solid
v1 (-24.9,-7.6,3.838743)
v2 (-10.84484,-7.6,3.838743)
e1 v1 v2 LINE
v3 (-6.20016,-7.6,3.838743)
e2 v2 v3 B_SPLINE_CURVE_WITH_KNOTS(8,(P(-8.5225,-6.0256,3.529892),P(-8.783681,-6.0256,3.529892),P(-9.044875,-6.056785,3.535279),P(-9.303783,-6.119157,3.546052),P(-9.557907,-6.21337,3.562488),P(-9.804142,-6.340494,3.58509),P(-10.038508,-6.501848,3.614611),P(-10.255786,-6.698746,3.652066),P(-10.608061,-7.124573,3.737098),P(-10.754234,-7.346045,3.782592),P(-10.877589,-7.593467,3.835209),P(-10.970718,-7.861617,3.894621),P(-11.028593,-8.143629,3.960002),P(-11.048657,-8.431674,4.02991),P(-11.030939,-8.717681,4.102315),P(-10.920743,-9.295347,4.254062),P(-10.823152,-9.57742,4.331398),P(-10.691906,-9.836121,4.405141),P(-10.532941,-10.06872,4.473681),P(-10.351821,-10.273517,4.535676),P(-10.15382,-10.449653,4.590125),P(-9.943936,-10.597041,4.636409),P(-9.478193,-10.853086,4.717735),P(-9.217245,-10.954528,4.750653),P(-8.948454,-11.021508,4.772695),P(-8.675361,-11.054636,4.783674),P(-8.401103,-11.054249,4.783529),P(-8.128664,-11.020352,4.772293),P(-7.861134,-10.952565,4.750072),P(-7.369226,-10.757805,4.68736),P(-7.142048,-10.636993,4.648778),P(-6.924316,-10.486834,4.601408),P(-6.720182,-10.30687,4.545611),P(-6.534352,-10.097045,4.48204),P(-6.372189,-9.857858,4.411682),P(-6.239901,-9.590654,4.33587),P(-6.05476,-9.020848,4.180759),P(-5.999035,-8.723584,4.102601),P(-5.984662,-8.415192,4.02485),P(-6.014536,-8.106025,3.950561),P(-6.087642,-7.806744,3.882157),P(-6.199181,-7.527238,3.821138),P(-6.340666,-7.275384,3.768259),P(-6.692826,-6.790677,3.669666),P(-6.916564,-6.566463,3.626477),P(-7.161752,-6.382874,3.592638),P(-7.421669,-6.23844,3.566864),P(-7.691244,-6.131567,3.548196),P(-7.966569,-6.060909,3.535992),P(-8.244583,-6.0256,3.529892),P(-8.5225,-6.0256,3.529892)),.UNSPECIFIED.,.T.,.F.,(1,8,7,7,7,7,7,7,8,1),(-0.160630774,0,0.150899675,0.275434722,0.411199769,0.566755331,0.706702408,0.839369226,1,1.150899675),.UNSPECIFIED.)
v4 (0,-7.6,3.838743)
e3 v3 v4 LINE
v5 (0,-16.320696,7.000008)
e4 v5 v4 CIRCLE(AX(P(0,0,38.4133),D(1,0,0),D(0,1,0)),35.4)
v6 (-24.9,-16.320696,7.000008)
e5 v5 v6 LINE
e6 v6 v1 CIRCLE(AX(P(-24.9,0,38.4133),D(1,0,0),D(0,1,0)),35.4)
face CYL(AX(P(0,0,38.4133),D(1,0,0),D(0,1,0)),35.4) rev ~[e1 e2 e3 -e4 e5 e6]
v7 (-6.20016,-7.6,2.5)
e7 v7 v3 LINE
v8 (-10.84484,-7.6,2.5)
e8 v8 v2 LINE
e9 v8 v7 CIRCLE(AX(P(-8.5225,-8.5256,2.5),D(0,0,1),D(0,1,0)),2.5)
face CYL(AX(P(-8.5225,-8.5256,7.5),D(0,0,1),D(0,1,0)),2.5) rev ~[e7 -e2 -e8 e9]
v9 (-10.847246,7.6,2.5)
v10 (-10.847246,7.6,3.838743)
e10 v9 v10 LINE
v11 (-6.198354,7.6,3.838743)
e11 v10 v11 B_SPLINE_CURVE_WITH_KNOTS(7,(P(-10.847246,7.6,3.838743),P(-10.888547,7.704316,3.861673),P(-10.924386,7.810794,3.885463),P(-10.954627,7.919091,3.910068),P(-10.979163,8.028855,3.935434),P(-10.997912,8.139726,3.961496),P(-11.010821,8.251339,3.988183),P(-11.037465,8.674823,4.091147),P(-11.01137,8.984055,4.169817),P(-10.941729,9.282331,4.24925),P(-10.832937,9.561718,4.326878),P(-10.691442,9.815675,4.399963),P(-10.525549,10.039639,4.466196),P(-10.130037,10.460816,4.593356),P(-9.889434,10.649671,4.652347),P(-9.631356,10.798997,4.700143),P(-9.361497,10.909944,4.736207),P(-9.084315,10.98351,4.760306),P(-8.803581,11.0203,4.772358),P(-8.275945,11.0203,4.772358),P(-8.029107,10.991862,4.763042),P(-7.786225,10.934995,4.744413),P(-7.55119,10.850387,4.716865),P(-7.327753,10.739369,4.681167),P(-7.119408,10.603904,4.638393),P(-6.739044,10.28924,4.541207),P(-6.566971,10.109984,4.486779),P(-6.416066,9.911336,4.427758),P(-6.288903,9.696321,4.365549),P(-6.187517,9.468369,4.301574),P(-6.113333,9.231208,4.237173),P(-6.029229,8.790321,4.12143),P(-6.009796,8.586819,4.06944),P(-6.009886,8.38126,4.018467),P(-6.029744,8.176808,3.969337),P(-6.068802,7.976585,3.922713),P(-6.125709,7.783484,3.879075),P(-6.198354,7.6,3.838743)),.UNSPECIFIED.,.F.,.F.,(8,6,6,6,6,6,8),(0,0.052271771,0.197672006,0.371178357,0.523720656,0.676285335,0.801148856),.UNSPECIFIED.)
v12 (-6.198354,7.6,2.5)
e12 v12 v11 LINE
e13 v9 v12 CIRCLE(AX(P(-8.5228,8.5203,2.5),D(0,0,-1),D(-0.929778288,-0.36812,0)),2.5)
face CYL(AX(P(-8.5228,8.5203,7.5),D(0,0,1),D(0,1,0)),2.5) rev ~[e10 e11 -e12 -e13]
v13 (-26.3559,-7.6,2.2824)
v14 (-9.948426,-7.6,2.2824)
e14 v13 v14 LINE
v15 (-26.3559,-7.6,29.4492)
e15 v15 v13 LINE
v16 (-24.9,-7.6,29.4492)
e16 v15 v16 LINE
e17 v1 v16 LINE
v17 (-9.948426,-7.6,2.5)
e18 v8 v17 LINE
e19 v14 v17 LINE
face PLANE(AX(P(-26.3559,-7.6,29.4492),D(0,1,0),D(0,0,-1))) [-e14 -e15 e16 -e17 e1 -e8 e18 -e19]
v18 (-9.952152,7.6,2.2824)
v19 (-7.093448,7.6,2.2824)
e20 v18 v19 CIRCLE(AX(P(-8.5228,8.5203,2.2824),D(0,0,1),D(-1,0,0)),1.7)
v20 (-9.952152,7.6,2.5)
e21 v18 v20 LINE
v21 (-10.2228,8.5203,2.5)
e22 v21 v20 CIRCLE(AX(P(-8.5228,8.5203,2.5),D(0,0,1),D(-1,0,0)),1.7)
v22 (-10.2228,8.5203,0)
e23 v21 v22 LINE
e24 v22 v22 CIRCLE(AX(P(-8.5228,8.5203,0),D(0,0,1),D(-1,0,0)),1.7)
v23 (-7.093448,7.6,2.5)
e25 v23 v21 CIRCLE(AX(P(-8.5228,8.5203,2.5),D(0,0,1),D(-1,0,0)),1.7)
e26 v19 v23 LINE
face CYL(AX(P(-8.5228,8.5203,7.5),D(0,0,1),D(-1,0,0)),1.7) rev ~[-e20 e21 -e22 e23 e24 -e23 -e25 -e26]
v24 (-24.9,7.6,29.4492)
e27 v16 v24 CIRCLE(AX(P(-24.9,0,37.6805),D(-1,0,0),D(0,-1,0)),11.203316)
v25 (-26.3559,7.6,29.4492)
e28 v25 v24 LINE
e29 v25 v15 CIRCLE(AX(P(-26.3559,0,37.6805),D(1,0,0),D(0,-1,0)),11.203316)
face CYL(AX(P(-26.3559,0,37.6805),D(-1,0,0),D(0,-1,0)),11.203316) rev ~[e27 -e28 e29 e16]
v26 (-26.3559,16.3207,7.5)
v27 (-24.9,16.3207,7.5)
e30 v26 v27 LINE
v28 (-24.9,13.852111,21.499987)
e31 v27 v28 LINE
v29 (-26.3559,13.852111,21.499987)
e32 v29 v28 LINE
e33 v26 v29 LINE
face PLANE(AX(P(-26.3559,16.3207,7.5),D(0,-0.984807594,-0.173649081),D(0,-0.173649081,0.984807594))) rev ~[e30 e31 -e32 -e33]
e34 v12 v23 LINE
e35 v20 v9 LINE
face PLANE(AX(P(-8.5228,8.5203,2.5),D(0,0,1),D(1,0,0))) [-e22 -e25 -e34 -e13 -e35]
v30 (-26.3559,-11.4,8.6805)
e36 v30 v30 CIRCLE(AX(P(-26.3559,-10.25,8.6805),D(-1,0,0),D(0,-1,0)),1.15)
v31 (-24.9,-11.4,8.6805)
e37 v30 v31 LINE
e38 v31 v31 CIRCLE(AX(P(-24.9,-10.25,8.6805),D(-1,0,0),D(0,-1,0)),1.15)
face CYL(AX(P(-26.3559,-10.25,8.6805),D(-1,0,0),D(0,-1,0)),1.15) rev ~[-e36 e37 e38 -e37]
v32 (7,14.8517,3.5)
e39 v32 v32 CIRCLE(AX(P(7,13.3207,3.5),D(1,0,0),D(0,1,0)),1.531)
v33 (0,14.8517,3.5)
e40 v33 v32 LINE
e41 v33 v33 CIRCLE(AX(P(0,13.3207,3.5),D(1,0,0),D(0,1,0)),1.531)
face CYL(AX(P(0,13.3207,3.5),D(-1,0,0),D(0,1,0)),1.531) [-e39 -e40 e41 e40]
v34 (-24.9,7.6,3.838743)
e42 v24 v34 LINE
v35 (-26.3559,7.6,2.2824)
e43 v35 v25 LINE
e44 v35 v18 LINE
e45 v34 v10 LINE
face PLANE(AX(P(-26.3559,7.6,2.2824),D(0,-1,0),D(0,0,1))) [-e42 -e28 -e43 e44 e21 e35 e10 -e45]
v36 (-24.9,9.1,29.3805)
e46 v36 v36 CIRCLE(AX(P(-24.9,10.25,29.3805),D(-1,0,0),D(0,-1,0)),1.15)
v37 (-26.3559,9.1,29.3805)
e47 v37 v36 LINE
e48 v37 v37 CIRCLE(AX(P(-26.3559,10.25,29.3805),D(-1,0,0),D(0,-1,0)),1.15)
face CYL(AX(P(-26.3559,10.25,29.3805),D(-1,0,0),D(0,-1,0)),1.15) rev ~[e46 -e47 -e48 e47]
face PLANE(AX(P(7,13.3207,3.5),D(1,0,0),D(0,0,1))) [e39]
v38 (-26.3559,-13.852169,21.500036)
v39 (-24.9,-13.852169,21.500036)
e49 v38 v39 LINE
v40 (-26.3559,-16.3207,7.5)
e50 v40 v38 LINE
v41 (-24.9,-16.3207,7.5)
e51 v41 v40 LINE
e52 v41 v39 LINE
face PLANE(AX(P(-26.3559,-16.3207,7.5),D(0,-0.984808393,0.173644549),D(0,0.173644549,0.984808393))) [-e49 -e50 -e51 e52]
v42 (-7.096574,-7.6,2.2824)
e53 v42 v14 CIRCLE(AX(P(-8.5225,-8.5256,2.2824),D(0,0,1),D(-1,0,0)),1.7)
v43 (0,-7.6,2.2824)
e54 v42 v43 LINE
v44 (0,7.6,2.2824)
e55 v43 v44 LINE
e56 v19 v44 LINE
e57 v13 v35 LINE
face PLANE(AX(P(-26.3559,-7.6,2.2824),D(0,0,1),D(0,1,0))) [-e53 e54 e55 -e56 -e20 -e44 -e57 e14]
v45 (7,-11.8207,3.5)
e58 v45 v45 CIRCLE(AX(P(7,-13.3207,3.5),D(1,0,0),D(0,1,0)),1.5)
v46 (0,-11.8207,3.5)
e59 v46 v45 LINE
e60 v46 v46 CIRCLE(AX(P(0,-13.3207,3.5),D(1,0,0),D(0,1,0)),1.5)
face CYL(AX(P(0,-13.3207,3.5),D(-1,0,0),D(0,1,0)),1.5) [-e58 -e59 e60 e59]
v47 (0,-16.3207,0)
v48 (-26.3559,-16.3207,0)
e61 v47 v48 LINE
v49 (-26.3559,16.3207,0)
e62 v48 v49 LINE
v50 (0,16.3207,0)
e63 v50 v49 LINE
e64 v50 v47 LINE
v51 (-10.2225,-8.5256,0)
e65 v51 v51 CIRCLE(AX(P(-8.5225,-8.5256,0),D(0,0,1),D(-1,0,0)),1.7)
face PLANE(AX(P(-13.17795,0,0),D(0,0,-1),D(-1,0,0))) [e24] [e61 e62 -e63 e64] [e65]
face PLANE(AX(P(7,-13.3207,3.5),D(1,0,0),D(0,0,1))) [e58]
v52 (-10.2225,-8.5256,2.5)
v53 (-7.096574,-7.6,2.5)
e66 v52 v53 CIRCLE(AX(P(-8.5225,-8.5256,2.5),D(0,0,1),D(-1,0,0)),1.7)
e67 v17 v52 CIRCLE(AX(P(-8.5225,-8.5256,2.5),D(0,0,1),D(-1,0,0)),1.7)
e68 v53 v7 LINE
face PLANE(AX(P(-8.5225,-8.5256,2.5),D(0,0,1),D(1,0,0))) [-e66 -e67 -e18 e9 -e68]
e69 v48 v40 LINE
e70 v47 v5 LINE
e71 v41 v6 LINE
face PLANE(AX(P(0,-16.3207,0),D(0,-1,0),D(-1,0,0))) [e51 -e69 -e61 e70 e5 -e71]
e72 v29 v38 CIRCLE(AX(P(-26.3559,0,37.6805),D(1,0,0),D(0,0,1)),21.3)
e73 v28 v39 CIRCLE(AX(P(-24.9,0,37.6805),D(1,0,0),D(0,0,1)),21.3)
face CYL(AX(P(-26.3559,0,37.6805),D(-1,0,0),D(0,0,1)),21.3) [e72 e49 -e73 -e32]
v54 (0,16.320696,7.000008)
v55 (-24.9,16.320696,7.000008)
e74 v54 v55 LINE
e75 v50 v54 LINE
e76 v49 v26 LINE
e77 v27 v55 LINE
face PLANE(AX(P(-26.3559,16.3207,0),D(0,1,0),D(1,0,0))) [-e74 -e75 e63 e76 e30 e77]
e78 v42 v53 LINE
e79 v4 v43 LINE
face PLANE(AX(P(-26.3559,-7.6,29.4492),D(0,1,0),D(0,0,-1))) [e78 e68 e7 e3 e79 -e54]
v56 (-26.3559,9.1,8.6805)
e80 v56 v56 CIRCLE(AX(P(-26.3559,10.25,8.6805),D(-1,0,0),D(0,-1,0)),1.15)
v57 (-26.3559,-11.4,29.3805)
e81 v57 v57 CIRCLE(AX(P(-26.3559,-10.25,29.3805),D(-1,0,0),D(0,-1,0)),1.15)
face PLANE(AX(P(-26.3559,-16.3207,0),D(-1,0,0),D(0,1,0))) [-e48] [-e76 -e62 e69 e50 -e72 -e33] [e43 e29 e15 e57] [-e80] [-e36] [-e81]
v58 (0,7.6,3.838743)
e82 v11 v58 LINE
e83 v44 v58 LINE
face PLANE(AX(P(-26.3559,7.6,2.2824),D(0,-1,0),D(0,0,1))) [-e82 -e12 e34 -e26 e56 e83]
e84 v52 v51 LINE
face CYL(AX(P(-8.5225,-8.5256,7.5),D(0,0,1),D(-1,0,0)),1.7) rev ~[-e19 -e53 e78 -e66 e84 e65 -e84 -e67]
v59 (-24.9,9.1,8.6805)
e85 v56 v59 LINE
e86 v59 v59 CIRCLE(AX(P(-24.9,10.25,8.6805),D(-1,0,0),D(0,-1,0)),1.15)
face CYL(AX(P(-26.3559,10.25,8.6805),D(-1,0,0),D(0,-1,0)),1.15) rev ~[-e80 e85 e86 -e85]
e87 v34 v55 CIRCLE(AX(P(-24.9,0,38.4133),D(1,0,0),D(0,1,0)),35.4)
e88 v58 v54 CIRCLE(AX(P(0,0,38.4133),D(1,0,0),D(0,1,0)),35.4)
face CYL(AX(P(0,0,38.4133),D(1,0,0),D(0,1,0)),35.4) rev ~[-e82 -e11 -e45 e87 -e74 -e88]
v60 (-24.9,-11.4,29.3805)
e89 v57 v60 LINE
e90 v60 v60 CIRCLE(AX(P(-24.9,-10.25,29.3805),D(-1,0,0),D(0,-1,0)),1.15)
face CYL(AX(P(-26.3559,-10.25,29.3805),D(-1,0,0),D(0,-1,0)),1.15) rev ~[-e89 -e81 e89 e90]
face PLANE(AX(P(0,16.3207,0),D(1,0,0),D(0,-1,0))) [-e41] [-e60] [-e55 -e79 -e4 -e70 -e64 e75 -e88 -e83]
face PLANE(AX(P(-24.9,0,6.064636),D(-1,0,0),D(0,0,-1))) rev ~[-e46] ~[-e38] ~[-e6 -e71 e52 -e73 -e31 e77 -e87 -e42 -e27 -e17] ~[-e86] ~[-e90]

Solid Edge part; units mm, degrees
sketch "Sketch1" plane through (0, 0, 0) normal (0, 0, 1) x (1, 0, 0)
  line L0 (-26.3559, 16.3207) -> (0, 16.3207)
  line L1 (0, 16.3207) -> (0, -16.3207)
  line L2 (0, -16.3207) -> (-26.3559, -16.3207)
  line L3 (-26.3559, -16.3207) -> (-26.3559, 16.3207)
extrude "Protrusion1" add sketch "Sketch1" along normal up to vertex (7.5 mm away)
sketch "Sketch2" plane through (0.0003, -13.7602, 7.5) normal (0, 0, 1) x (-1, 0, 0)
  circle A0 centre (8.5228, -5.2346) radius 1.7
  circle A1 centre (8.5231, -22.2805) radius 1.7
extrude "Cutout1" cut sketch "Sketch2" against normal up to next
sketch "Sketch3" plane through (0.0003, -13.7602, 7.5) normal (0, 0, 1) x (0, 1, 0)
  circle A0 centre (5.2346, 8.5228) radius 2.5
  circle A1 centre (22.2805, 8.5231) radius 2.5
extrude "Cutout2" cut sketch "Sketch3" against normal blind 5
sketch "Sketch4" plane through (0, 0, 3.5) normal (1, 0, 0) x (0, 1, 0)
  line L0 (-16.3207, 4) -> (16.3207, 4)
  line L1 (16.3207, 4) -> (16.3207, 3.5)
  arc A0 (-16.3207, 3.5) -> (16.3207, 3.5) centre (0, 34.9133) ccw
  line L2 (-16.3207, 4) -> (-16.3207, 3.5)
extrude "Cutout3" cut sketch "Sketch4" against normal blind 24.9
sketch "Sketch5" plane through (0, 0, 3.5) normal (1, 0, 0) x (0, 1, 0)
  circle A0 centre (-13.3207, 0) radius 1.5
  circle A1 centre (13.3207, 0) radius 1.531
extrude "Protrusion2" add sketch "Sketch5" along normal blind 7
sketch "Sketch6" plane through (-26.3559, -27.5204, 3.5) normal (-1, 0, 0) x (0, 0, 1)
  line L0 (4, 43.8411) -> (18, 41.3725)
  arc A0 (18, 41.3725) -> (18, 13.6682) centre (34.1805, 27.5204) cw
  line L1 (4, 11.1997) -> (18, 13.6682)
  line L2 (-3.5, 11.1997) -> (4, 11.1997)
  line L3 (-3.5, 43.8411) -> (-3.5, 11.1997)
  line L4 (4, 43.8411) -> (-3.5, 43.8411)
extrude "Protrusion3" add sketch "Sketch6" against normal up to vertex (1.4559 mm away)
sketch "Sketch7" plane through (-26.3559, -27.5204, 30.1014) normal (-1, 0, 0) x (0, -1, 0)
  circle A0 centre (-17.2704, -0.7209) radius 1.15
  circle A1 centre (-17.2704, -21.4209) radius 1.15
  circle A2 centre (-37.7704, -21.4209) radius 1.15
  circle A3 centre (-37.7704, -0.7209) radius 1.15
  arc A4 (-35.1204, -0.6522) -> (-19.9204, -0.6522) centre (-27.5204, 7.5791) cw
  line L0 (-19.9204, -0.6522) -> (-19.9204, -27.819)
  line L1 (-19.9204, -27.819) -> (-35.1204, -27.819)
  line L2 (-35.1204, -27.819) -> (-35.1204, -0.6522)
  dimension "D1" = 0.6
extrude "Cutout4" cut sketch "Sketch7" against normal up to next
